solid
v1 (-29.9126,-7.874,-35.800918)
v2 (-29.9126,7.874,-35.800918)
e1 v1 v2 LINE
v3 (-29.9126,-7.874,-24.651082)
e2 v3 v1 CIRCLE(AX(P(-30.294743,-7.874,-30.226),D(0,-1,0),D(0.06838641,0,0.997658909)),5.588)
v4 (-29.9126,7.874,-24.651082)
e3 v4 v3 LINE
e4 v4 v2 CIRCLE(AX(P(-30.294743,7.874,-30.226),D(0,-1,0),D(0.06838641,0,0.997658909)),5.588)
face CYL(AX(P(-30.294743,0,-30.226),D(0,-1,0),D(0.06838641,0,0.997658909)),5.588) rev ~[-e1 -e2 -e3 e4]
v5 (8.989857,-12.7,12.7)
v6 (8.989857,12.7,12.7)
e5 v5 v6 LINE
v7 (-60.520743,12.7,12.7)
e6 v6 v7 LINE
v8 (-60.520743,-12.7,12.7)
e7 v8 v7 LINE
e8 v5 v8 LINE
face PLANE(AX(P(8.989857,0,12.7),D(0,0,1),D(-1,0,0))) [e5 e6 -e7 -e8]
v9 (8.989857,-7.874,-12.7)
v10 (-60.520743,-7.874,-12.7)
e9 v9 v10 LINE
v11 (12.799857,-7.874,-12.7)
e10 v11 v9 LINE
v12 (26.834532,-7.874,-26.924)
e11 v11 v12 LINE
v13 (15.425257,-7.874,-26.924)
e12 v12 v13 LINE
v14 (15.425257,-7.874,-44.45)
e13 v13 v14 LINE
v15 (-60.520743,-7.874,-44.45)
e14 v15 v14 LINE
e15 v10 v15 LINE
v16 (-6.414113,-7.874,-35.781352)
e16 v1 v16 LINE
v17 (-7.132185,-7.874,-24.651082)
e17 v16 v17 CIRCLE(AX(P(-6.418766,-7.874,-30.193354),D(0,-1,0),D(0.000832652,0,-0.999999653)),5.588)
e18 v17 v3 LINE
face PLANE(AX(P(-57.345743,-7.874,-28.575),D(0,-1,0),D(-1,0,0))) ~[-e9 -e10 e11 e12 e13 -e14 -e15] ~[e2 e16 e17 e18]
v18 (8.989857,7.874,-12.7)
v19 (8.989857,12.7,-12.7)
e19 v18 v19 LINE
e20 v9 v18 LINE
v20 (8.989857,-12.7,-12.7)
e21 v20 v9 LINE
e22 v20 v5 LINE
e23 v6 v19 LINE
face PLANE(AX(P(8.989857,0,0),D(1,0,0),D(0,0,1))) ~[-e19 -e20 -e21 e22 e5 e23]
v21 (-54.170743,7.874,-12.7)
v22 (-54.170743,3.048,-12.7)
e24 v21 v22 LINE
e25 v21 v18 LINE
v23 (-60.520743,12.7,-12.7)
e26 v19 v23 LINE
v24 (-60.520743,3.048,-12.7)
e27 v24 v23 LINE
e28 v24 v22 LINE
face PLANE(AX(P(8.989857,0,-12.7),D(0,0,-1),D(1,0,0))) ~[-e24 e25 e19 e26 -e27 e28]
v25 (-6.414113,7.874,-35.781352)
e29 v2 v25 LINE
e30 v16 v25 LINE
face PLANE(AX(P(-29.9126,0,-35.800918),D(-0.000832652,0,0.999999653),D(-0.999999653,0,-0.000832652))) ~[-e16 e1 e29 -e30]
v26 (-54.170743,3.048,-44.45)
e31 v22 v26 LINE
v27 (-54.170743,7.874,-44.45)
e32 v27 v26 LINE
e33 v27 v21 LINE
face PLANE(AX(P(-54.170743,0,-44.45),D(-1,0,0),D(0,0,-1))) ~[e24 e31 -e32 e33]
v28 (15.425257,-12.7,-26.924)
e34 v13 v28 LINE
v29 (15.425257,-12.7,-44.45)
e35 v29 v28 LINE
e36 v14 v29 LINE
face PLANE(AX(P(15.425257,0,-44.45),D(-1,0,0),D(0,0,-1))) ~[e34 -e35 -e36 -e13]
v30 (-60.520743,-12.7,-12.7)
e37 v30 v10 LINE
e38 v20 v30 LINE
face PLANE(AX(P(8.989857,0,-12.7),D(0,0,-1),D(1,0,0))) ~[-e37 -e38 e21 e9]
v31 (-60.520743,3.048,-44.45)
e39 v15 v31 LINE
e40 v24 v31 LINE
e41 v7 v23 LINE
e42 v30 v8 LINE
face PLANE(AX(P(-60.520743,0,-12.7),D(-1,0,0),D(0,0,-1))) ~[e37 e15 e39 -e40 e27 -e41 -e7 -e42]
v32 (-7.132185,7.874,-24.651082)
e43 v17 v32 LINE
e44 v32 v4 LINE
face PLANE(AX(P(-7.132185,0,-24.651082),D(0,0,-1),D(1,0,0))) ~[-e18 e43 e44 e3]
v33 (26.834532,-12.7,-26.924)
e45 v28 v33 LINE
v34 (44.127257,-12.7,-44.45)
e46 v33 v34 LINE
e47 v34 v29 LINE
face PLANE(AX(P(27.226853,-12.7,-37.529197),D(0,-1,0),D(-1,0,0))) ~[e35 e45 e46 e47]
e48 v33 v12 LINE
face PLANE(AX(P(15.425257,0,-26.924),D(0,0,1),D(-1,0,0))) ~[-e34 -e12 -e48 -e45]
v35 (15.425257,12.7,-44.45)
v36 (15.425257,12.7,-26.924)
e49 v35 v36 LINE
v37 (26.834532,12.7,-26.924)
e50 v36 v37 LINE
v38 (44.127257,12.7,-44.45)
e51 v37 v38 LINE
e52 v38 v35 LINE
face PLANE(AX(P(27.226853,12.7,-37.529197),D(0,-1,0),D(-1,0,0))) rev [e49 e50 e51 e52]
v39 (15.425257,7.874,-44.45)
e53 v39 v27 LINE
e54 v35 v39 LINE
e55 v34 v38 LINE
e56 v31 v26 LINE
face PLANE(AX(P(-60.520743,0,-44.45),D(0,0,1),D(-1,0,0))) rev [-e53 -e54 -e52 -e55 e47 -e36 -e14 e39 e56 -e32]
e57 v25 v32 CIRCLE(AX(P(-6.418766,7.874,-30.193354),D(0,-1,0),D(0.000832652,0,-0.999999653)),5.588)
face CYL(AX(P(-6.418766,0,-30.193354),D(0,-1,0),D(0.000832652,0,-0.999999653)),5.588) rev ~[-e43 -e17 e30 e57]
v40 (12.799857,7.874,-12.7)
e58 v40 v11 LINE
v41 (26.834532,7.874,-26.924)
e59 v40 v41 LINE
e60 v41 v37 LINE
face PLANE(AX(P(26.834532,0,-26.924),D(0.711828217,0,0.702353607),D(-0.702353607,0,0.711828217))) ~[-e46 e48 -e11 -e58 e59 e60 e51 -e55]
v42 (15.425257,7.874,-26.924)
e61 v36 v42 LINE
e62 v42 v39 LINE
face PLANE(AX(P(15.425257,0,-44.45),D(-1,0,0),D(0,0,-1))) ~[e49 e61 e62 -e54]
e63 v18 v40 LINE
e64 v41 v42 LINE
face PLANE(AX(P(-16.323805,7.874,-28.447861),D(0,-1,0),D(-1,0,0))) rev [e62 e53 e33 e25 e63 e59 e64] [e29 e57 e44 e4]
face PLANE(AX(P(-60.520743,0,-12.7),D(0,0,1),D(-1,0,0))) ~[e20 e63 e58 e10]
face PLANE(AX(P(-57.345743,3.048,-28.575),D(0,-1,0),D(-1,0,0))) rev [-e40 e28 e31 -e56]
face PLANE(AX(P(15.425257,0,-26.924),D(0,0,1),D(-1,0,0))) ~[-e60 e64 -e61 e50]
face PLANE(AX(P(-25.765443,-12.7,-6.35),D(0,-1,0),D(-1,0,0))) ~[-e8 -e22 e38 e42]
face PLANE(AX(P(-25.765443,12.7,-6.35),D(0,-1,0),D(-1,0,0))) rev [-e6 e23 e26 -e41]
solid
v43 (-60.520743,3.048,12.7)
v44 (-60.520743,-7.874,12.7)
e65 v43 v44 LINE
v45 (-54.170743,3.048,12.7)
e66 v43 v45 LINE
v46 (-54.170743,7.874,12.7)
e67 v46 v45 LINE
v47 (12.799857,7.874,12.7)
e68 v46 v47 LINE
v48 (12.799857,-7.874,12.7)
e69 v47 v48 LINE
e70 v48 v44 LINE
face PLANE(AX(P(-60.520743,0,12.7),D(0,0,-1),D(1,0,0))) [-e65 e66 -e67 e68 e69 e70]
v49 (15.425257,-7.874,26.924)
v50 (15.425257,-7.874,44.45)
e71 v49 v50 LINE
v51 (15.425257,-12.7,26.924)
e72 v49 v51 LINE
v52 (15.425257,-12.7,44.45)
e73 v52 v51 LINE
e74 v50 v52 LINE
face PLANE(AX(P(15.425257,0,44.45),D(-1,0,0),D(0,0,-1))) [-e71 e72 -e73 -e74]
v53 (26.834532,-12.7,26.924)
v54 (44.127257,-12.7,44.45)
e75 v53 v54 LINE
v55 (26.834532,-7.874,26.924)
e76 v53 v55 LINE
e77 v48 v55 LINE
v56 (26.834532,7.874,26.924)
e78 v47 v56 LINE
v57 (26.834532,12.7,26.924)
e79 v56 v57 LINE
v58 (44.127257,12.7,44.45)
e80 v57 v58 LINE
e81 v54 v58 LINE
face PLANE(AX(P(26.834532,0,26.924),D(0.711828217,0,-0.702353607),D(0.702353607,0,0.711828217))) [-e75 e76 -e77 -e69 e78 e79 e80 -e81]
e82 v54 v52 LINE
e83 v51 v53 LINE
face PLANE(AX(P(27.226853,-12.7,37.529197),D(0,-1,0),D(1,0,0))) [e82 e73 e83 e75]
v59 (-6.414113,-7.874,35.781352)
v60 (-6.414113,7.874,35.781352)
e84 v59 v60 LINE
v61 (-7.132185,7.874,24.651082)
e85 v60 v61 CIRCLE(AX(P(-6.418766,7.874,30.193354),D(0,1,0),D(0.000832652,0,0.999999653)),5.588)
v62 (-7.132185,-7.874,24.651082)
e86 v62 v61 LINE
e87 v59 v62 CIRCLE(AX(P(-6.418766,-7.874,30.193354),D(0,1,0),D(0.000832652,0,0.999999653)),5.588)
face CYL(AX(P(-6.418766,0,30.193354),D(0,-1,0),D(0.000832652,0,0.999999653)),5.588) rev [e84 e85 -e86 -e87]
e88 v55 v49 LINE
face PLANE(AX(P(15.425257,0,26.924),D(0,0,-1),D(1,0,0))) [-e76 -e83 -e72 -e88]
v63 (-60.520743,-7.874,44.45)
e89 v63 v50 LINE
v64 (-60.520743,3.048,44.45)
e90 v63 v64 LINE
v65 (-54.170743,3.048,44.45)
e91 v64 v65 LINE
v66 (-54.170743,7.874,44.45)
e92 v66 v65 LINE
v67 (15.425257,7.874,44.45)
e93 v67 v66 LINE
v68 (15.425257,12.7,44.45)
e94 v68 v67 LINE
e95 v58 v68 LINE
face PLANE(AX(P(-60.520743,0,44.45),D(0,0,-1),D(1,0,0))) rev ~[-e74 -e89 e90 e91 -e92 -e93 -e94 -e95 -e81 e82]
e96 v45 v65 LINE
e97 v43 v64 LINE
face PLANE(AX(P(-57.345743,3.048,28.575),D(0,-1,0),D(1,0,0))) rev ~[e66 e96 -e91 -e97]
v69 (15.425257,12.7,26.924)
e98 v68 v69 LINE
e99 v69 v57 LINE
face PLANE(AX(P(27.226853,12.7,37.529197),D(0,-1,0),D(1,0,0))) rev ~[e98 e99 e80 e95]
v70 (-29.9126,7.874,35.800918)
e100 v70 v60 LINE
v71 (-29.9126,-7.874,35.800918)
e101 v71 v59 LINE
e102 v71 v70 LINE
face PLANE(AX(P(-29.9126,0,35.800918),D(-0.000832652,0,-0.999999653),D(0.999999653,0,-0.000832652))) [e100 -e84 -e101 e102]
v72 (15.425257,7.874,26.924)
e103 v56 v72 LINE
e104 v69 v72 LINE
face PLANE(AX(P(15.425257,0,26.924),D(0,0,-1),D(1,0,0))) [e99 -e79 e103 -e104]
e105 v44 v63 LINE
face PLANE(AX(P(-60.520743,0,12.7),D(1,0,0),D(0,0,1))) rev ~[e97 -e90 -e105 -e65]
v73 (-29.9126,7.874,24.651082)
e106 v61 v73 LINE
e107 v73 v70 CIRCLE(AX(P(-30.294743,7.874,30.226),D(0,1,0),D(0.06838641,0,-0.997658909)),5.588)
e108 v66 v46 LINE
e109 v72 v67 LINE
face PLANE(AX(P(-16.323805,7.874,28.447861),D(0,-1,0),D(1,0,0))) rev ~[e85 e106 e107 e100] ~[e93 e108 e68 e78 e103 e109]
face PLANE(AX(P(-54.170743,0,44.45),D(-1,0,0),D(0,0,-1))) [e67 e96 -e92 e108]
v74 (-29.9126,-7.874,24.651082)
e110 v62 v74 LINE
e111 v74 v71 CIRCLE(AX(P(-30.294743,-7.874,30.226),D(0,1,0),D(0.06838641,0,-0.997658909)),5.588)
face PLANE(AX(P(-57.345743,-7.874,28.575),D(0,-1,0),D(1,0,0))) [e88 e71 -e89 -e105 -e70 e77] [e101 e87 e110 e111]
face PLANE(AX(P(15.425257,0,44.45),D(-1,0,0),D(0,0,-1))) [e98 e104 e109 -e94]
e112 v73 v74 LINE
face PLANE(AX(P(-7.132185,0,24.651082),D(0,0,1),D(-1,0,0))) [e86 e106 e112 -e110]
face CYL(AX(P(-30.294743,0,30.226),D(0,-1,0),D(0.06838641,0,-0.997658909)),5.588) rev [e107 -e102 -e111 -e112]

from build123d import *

# Parameters (mm, degrees)
F1_DEPTH      = 12.7
F2_DEPTH      = 7.874
F0_W          = 6.35
F0_H          = 31.75
F3_DEPTH      = 7.874
F3_DEPTH_BACK = 3.048


with BuildPart() as f1:
    # F0 (on Front) → F1 (new body, symmetric)
    with BuildSketch(Plane.XZ):
        Polygon((-54.1707432052, 12.7), (-60.5207432052, 12.7), (-60.5207432052, 0), (8.9898571843, 0), (8.9898571843, 12.7), align=None)
    extrude(amount=F1_DEPTH, both=True)



with BuildPart() as f1b:
    # F0 (on Front) → F1, piece 2 (new body, symmetric)
    with BuildSketch(Plane.XZ):
        Polygon((44.1272567948, 44.45), (15.4252567948, 44.45), (15.4252567948, 26.924), (26.8345322098, 26.924), align=None)
    extrude(amount=F1_DEPTH, both=True)

    # F0 (on Front) → F2 (join, symmetric)
    with BuildSketch(Plane.XZ):
        Polygon((15.4252567948, 44.45), (-54.1707432052, 44.45), (-54.1707432052, 12.7), (8.9898571843, 12.7), (12.7998571843, 12.7), (26.8345322098, 26.924), (15.4252567948, 26.924), align=None)
        with BuildLine():
            ThreePointArc((-29.9125999436, 24.6510820161), (-35.8827432052, 30.226), (-29.9125999436, 35.8009179839))
            Line((-29.9125999436, 35.8009179839), (-6.4141126637, 35.7813519105))
            ThreePointArc((-6.4141126637, 35.7813519105), (-0.8423585797, 29.8335906051), (-7.1321847174, 24.6510820161))
            Line((-7.1321847174, 24.6510820161), (-29.9125999436, 24.6510820161))
        make_face(mode=Mode.SUBTRACT)
    extrude(amount=F2_DEPTH, both=True)

    # F0 (on Front) → F3 (join, two sides)
    with BuildSketch(Plane.XZ) as f3_sk:
        with Locations((-57.3457432052, 28.575)):
            Rectangle(F0_W, F0_H)
    extrude(amount=F3_DEPTH)
    extrude(f3_sk.sketch, amount=-F3_DEPTH_BACK)


with BuildPart() as f1_1:
    add(f1.part)
    # F4: F1b, F1 across plane
    add(f1b.part.mirror(Plane.XY))
    add(f1.part.mirror(Plane.XY))


solid = Compound([f1b.part, f1_1.part])
